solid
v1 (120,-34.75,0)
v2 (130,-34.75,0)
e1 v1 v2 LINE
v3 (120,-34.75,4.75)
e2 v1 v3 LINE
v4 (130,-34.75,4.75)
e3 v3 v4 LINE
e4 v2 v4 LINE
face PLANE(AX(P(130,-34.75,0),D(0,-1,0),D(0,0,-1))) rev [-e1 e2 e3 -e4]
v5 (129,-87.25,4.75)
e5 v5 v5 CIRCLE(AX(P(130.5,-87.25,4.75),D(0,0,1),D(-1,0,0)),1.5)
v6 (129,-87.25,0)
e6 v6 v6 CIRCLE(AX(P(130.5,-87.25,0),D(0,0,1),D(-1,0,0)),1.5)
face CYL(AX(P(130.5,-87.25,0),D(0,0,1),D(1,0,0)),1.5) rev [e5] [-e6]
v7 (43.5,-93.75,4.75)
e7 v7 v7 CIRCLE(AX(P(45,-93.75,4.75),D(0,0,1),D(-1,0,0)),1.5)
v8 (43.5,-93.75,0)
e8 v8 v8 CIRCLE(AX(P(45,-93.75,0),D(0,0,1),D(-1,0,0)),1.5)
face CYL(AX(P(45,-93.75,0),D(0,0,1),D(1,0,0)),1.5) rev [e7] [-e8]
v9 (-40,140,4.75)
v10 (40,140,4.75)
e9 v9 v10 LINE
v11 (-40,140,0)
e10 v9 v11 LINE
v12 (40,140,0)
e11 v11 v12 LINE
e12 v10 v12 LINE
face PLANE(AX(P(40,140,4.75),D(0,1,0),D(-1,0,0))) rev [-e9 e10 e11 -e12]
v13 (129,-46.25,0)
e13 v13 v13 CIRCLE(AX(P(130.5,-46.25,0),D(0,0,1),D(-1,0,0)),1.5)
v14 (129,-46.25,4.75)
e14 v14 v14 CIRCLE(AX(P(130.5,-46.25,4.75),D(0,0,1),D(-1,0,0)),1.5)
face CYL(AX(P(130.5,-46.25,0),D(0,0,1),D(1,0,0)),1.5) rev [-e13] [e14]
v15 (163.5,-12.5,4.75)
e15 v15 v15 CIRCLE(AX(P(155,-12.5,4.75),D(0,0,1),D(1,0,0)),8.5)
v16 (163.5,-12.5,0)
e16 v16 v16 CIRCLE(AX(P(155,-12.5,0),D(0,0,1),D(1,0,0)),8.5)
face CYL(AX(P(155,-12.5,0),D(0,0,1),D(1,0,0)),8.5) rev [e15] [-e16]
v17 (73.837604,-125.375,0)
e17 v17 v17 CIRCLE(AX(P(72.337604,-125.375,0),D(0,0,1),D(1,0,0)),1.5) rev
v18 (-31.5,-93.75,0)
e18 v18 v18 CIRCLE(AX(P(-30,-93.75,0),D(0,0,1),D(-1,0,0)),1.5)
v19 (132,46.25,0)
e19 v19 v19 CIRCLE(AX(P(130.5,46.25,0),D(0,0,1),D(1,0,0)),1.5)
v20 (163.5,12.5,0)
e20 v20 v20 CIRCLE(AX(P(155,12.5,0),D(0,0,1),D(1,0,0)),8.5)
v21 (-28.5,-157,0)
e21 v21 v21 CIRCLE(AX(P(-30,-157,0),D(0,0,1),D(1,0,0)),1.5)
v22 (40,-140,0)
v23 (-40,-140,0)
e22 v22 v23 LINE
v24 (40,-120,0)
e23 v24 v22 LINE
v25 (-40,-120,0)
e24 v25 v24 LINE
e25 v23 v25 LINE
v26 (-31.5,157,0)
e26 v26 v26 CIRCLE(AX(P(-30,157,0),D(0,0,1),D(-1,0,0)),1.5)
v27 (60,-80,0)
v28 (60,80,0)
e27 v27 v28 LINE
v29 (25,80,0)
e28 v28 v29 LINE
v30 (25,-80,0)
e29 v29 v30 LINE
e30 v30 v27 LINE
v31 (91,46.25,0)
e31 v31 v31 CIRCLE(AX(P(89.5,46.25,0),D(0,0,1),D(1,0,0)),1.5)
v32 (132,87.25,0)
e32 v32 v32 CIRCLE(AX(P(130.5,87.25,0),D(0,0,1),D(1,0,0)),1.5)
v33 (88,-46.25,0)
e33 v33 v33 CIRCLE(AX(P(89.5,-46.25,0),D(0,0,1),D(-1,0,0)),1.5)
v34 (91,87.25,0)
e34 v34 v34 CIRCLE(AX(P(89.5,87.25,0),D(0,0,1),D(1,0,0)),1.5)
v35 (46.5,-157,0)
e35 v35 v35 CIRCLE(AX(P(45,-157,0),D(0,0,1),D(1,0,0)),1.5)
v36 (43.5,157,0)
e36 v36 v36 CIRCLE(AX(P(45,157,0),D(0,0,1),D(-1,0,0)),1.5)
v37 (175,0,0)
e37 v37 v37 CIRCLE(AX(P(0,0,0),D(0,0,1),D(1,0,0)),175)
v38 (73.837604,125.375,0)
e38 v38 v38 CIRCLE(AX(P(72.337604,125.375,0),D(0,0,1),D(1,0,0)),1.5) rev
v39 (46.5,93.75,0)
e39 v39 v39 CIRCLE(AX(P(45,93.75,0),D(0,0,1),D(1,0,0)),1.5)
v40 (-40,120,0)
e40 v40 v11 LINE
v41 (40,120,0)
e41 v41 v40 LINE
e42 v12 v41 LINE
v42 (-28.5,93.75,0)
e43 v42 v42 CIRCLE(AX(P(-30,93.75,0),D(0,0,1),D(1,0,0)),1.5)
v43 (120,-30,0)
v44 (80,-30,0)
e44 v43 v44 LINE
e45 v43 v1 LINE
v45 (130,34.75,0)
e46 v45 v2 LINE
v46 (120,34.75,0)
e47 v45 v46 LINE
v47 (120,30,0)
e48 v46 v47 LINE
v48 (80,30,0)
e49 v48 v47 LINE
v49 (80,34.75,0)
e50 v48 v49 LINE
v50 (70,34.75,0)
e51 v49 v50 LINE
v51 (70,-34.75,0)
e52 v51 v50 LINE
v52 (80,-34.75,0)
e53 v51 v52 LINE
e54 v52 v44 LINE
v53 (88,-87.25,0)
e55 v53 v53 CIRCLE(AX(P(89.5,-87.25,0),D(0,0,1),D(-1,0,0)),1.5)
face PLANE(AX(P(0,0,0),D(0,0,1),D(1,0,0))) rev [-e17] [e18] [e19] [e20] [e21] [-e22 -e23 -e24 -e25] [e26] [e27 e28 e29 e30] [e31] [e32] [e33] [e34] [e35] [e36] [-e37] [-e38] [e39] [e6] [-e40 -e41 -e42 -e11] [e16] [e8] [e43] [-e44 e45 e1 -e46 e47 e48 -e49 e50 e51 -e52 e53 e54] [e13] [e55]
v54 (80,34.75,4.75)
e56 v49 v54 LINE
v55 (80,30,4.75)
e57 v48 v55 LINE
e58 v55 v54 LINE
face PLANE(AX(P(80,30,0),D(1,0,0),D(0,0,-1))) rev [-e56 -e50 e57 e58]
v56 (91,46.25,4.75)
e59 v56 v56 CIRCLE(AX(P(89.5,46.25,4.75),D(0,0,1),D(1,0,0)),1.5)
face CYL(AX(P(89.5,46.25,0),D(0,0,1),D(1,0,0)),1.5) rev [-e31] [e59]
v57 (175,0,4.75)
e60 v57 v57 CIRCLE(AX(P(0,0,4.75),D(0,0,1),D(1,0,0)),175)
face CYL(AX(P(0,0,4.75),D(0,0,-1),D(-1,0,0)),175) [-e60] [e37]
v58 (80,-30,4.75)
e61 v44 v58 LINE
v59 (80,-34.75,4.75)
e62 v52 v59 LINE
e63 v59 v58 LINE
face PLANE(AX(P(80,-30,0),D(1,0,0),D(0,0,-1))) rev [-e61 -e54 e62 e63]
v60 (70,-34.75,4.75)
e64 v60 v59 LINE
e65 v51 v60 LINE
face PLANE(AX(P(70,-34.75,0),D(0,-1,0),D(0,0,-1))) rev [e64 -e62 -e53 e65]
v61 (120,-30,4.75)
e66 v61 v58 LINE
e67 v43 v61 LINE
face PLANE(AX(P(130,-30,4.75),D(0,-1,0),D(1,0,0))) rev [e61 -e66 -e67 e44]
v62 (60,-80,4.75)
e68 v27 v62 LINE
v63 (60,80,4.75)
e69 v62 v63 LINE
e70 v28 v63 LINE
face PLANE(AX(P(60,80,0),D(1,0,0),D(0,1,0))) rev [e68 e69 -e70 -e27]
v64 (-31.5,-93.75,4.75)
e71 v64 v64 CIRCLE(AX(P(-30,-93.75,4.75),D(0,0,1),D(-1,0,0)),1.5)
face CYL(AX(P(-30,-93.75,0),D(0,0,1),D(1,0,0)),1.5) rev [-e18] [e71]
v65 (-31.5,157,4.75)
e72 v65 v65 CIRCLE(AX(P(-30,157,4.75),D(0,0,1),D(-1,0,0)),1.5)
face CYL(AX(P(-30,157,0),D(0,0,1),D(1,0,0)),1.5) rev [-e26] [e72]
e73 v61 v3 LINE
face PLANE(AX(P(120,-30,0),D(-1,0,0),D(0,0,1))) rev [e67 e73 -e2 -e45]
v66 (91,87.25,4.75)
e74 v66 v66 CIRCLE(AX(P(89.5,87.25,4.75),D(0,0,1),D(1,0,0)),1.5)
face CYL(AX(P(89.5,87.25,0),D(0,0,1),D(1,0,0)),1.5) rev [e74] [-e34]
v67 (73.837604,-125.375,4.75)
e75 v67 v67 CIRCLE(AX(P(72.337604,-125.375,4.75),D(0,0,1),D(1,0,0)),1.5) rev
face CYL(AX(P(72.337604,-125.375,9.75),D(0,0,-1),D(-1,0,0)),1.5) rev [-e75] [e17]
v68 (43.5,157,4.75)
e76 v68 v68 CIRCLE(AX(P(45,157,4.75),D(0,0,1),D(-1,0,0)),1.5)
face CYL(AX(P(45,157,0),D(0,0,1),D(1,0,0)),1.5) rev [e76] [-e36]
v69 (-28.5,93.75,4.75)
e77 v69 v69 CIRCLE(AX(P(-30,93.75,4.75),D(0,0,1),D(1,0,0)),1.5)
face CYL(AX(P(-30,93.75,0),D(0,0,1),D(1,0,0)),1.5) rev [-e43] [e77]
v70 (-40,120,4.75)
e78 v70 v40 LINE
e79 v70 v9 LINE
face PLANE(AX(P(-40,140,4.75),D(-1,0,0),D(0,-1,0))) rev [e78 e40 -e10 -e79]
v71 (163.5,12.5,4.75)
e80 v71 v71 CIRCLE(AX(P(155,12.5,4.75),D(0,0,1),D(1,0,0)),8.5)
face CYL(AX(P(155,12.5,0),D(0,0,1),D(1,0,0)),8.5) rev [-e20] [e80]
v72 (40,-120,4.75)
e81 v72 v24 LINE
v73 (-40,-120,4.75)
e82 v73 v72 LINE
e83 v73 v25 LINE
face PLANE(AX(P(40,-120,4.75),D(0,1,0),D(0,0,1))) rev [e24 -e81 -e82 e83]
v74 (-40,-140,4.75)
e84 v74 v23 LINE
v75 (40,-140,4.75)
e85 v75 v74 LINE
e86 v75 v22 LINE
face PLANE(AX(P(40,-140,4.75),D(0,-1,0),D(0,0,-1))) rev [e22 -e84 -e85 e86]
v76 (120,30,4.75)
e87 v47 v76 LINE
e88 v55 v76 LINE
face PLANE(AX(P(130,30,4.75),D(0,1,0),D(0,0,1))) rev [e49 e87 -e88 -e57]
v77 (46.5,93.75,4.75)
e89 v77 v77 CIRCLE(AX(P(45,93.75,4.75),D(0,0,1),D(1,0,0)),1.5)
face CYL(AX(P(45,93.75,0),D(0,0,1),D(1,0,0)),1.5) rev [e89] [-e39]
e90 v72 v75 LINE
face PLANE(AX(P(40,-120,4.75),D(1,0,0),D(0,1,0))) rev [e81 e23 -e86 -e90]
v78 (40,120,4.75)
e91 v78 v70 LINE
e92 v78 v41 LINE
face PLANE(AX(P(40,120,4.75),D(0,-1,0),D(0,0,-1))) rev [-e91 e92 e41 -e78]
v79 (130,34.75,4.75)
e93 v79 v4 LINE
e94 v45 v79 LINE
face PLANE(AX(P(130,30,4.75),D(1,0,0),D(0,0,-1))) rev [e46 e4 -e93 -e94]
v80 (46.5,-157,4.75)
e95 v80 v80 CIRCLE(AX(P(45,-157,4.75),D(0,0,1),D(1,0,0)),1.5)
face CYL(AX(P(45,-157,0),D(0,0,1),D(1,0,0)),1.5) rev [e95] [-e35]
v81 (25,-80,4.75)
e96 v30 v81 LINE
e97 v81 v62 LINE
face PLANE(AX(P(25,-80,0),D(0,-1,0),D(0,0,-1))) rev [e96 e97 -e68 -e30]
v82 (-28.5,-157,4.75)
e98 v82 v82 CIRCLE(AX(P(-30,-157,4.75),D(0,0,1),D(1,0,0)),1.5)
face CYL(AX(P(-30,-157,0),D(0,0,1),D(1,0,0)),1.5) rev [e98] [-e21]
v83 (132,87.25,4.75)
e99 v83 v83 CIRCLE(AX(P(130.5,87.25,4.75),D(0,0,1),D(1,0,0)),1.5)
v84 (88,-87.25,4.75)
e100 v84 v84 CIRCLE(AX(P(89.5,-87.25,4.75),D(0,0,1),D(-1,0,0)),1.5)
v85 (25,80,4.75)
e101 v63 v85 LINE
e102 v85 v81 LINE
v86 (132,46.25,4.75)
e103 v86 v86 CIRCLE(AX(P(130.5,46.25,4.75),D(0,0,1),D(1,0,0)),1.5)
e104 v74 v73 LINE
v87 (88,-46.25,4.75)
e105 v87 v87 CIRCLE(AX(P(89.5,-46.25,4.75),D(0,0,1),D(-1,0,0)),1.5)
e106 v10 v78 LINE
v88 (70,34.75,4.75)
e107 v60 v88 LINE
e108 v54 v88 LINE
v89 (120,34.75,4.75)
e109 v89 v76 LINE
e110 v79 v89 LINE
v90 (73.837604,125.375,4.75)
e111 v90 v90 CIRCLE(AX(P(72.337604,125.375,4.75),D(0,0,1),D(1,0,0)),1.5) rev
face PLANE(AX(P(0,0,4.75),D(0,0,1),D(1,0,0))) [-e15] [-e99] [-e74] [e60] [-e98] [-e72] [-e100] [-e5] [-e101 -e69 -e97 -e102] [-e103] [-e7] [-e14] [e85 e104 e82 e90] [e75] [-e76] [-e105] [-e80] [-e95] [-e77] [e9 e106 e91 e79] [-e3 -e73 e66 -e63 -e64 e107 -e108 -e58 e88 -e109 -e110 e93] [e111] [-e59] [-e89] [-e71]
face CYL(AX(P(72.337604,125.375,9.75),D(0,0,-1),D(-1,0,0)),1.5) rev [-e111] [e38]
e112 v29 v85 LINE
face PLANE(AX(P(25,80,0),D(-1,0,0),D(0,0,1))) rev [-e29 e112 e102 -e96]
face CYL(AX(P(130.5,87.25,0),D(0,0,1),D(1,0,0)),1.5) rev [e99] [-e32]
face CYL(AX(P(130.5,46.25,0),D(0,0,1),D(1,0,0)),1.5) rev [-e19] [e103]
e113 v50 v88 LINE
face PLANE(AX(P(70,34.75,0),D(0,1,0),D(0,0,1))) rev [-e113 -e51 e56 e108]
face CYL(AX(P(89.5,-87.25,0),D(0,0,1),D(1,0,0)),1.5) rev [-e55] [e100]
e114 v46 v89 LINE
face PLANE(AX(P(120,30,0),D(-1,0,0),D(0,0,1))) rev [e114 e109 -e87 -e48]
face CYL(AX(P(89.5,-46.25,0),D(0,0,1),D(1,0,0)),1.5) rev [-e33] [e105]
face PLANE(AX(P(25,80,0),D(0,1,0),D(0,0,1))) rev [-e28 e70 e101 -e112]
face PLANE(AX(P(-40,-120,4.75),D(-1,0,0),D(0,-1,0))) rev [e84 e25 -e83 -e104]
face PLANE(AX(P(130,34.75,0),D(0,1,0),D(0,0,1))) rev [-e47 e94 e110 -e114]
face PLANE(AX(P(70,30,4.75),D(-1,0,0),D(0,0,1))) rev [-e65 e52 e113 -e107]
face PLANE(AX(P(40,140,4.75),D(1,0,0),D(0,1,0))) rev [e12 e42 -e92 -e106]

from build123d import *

# Parameters (mm, degrees)
SKETCH1_R           = 175
BOSS_EXTRUDE1_DEPTH = 4.75
SKETCH2_W           = 80
SKETCH2_H           = 20
SKETCH2_W_2         = 60
SKETCH2_H_2         = 60
CUT_EXTRUDE1_DEPTH  = 4.75
SKETCH3_W           = 10
SKETCH3_H           = 4.75
CUT_EXTRUDE2_DEPTH  = 4.75
SKETCH4_R           = 1.5
CUT_EXTRUDE3_DEPTH  = 248.532952352
SKETCH5_R           = 1.5
CUT_EXTRUDE4_DEPTH  = 248.532952352
SKETCH6_R           = 8.5
CUT_EXTRUDE5_DEPTH  = 4.75
CAVITY1_OUTLINE_R   = 1.5
CAVITY1_DEPTH       = 4.75
SKETCH7_W           = 35
SKETCH7_H           = 160
CUT_EXTRUDE6_DEPTH  = 248.532952352


# Read off the part's stored shape, not the designer's step: Cavity1
with BuildPart() as part:
    # Sketch1 → Boss-Extrude1 (new body)
    with BuildSketch(Plane.XY):
        Circle(SKETCH1_R)
    extrude(amount=BOSS_EXTRUDE1_DEPTH)

    # Sketch2 → Cut-Extrude1 (cut)
    with BuildSketch(Plane(origin=(0, 0, 0), x_dir=(-1, 0, 0), z_dir=(0, 0, -1))):
        with Locations((0, 130)):
            Rectangle(SKETCH2_W, SKETCH2_H)
        with Locations((0, -130)):
            Rectangle(SKETCH2_W, SKETCH2_H)
        with Locations((-100, 0)):
            Rectangle(SKETCH2_W_2, SKETCH2_H_2)
    extrude(amount=-CUT_EXTRUDE1_DEPTH, mode=Mode.SUBTRACT)

    # Sketch3 → Cut-Extrude2 (cut)
    with BuildSketch(Plane.XY.offset(4.75)):
        with Locations((75, 32.375)):
            Rectangle(SKETCH3_W, SKETCH3_H)
        with Locations((125, 32.375)):
            Rectangle(SKETCH3_W, SKETCH3_H)
        with Locations((75, -32.375)):
            Rectangle(SKETCH3_W, SKETCH3_H)
        with Locations((125, -32.375)):
            Rectangle(SKETCH3_W, SKETCH3_H)
    extrude(amount=-CUT_EXTRUDE2_DEPTH, mode=Mode.SUBTRACT)

    # Sketch4 → Cut-Extrude3 (cut, through all)
    with BuildSketch(Plane.XY.offset(4.75)):
        with Locations((-30, -157)):
            Circle(SKETCH4_R)
        with Locations((45, -157)):
            Circle(SKETCH4_R)
        with Locations(Location((-30, 157, 0), (0, 0, 180))):
            Circle(SKETCH4_R)
        with Locations(Location((45, 157, 0), (0, 0, 180))):
            Circle(SKETCH4_R)
        with Locations(Location((45, -93.75, 0), (0, 0, 180))):
            Circle(SKETCH4_R)
        with Locations(Location((-30, -93.75, 0), (0, 0, 180))):
            Circle(SKETCH4_R)
        with Locations((45, 93.75)):
            Circle(SKETCH4_R)
        with Locations((-30, 93.75)):
            Circle(SKETCH4_R)
    extrude(amount=-CUT_EXTRUDE3_DEPTH, mode=Mode.SUBTRACT)

    # Sketch5 → Cut-Extrude4 (cut, through all)
    with BuildSketch(Plane.XY.offset(4.75)):
        with Locations((89.5, 87.25)):
            Circle(SKETCH5_R)
        with Locations((130.5, 87.25)):
            Circle(SKETCH5_R)
        with Locations((130.5, 46.25)):
            Circle(SKETCH5_R)
        with Locations((89.5, 46.25)):
            Circle(SKETCH5_R)
        with Locations(Location((89.5, -87.25, 0), (0, 0, 180))):
            Circle(SKETCH5_R)
        with Locations(Location((130.5, -87.25, 0), (0, 0, 180))):
            Circle(SKETCH5_R)
        with Locations(Location((130.5, -46.25, 0), (0, 0, 180))):
            Circle(SKETCH5_R)
        with Locations(Location((89.5, -46.25, 0), (0, 0, 180))):
            Circle(SKETCH5_R)
    extrude(amount=-CUT_EXTRUDE4_DEPTH, mode=Mode.SUBTRACT)

    # Sketch6 → Cut-Extrude5 (cut)
    with BuildSketch(Plane.XY.offset(4.75)):
        with Locations((155, 12.5)):
            Circle(SKETCH6_R)
        with Locations((155, -12.5)):
            Circle(SKETCH6_R)
    extrude(amount=-CUT_EXTRUDE5_DEPTH, mode=Mode.SUBTRACT)

    # Cavity1 outline → Cavity1 (cut)
    with BuildSketch(Plane.XY):
        with Locations((72.337603572, -125.375)):
            Circle(CAVITY1_OUTLINE_R)
        with Locations((72.337603572, 125.375)):
            Circle(CAVITY1_OUTLINE_R)
    extrude(amount=CAVITY1_DEPTH, mode=Mode.SUBTRACT)

    # Sketch7 → Cut-Extrude6 (cut, through all)
    with BuildSketch(Plane.XY.offset(4.75)):
        with Locations((42.5, 0)):
            Rectangle(SKETCH7_W, SKETCH7_H)
    extrude(amount=-CUT_EXTRUDE6_DEPTH, mode=Mode.SUBTRACT)


solid = part.part
